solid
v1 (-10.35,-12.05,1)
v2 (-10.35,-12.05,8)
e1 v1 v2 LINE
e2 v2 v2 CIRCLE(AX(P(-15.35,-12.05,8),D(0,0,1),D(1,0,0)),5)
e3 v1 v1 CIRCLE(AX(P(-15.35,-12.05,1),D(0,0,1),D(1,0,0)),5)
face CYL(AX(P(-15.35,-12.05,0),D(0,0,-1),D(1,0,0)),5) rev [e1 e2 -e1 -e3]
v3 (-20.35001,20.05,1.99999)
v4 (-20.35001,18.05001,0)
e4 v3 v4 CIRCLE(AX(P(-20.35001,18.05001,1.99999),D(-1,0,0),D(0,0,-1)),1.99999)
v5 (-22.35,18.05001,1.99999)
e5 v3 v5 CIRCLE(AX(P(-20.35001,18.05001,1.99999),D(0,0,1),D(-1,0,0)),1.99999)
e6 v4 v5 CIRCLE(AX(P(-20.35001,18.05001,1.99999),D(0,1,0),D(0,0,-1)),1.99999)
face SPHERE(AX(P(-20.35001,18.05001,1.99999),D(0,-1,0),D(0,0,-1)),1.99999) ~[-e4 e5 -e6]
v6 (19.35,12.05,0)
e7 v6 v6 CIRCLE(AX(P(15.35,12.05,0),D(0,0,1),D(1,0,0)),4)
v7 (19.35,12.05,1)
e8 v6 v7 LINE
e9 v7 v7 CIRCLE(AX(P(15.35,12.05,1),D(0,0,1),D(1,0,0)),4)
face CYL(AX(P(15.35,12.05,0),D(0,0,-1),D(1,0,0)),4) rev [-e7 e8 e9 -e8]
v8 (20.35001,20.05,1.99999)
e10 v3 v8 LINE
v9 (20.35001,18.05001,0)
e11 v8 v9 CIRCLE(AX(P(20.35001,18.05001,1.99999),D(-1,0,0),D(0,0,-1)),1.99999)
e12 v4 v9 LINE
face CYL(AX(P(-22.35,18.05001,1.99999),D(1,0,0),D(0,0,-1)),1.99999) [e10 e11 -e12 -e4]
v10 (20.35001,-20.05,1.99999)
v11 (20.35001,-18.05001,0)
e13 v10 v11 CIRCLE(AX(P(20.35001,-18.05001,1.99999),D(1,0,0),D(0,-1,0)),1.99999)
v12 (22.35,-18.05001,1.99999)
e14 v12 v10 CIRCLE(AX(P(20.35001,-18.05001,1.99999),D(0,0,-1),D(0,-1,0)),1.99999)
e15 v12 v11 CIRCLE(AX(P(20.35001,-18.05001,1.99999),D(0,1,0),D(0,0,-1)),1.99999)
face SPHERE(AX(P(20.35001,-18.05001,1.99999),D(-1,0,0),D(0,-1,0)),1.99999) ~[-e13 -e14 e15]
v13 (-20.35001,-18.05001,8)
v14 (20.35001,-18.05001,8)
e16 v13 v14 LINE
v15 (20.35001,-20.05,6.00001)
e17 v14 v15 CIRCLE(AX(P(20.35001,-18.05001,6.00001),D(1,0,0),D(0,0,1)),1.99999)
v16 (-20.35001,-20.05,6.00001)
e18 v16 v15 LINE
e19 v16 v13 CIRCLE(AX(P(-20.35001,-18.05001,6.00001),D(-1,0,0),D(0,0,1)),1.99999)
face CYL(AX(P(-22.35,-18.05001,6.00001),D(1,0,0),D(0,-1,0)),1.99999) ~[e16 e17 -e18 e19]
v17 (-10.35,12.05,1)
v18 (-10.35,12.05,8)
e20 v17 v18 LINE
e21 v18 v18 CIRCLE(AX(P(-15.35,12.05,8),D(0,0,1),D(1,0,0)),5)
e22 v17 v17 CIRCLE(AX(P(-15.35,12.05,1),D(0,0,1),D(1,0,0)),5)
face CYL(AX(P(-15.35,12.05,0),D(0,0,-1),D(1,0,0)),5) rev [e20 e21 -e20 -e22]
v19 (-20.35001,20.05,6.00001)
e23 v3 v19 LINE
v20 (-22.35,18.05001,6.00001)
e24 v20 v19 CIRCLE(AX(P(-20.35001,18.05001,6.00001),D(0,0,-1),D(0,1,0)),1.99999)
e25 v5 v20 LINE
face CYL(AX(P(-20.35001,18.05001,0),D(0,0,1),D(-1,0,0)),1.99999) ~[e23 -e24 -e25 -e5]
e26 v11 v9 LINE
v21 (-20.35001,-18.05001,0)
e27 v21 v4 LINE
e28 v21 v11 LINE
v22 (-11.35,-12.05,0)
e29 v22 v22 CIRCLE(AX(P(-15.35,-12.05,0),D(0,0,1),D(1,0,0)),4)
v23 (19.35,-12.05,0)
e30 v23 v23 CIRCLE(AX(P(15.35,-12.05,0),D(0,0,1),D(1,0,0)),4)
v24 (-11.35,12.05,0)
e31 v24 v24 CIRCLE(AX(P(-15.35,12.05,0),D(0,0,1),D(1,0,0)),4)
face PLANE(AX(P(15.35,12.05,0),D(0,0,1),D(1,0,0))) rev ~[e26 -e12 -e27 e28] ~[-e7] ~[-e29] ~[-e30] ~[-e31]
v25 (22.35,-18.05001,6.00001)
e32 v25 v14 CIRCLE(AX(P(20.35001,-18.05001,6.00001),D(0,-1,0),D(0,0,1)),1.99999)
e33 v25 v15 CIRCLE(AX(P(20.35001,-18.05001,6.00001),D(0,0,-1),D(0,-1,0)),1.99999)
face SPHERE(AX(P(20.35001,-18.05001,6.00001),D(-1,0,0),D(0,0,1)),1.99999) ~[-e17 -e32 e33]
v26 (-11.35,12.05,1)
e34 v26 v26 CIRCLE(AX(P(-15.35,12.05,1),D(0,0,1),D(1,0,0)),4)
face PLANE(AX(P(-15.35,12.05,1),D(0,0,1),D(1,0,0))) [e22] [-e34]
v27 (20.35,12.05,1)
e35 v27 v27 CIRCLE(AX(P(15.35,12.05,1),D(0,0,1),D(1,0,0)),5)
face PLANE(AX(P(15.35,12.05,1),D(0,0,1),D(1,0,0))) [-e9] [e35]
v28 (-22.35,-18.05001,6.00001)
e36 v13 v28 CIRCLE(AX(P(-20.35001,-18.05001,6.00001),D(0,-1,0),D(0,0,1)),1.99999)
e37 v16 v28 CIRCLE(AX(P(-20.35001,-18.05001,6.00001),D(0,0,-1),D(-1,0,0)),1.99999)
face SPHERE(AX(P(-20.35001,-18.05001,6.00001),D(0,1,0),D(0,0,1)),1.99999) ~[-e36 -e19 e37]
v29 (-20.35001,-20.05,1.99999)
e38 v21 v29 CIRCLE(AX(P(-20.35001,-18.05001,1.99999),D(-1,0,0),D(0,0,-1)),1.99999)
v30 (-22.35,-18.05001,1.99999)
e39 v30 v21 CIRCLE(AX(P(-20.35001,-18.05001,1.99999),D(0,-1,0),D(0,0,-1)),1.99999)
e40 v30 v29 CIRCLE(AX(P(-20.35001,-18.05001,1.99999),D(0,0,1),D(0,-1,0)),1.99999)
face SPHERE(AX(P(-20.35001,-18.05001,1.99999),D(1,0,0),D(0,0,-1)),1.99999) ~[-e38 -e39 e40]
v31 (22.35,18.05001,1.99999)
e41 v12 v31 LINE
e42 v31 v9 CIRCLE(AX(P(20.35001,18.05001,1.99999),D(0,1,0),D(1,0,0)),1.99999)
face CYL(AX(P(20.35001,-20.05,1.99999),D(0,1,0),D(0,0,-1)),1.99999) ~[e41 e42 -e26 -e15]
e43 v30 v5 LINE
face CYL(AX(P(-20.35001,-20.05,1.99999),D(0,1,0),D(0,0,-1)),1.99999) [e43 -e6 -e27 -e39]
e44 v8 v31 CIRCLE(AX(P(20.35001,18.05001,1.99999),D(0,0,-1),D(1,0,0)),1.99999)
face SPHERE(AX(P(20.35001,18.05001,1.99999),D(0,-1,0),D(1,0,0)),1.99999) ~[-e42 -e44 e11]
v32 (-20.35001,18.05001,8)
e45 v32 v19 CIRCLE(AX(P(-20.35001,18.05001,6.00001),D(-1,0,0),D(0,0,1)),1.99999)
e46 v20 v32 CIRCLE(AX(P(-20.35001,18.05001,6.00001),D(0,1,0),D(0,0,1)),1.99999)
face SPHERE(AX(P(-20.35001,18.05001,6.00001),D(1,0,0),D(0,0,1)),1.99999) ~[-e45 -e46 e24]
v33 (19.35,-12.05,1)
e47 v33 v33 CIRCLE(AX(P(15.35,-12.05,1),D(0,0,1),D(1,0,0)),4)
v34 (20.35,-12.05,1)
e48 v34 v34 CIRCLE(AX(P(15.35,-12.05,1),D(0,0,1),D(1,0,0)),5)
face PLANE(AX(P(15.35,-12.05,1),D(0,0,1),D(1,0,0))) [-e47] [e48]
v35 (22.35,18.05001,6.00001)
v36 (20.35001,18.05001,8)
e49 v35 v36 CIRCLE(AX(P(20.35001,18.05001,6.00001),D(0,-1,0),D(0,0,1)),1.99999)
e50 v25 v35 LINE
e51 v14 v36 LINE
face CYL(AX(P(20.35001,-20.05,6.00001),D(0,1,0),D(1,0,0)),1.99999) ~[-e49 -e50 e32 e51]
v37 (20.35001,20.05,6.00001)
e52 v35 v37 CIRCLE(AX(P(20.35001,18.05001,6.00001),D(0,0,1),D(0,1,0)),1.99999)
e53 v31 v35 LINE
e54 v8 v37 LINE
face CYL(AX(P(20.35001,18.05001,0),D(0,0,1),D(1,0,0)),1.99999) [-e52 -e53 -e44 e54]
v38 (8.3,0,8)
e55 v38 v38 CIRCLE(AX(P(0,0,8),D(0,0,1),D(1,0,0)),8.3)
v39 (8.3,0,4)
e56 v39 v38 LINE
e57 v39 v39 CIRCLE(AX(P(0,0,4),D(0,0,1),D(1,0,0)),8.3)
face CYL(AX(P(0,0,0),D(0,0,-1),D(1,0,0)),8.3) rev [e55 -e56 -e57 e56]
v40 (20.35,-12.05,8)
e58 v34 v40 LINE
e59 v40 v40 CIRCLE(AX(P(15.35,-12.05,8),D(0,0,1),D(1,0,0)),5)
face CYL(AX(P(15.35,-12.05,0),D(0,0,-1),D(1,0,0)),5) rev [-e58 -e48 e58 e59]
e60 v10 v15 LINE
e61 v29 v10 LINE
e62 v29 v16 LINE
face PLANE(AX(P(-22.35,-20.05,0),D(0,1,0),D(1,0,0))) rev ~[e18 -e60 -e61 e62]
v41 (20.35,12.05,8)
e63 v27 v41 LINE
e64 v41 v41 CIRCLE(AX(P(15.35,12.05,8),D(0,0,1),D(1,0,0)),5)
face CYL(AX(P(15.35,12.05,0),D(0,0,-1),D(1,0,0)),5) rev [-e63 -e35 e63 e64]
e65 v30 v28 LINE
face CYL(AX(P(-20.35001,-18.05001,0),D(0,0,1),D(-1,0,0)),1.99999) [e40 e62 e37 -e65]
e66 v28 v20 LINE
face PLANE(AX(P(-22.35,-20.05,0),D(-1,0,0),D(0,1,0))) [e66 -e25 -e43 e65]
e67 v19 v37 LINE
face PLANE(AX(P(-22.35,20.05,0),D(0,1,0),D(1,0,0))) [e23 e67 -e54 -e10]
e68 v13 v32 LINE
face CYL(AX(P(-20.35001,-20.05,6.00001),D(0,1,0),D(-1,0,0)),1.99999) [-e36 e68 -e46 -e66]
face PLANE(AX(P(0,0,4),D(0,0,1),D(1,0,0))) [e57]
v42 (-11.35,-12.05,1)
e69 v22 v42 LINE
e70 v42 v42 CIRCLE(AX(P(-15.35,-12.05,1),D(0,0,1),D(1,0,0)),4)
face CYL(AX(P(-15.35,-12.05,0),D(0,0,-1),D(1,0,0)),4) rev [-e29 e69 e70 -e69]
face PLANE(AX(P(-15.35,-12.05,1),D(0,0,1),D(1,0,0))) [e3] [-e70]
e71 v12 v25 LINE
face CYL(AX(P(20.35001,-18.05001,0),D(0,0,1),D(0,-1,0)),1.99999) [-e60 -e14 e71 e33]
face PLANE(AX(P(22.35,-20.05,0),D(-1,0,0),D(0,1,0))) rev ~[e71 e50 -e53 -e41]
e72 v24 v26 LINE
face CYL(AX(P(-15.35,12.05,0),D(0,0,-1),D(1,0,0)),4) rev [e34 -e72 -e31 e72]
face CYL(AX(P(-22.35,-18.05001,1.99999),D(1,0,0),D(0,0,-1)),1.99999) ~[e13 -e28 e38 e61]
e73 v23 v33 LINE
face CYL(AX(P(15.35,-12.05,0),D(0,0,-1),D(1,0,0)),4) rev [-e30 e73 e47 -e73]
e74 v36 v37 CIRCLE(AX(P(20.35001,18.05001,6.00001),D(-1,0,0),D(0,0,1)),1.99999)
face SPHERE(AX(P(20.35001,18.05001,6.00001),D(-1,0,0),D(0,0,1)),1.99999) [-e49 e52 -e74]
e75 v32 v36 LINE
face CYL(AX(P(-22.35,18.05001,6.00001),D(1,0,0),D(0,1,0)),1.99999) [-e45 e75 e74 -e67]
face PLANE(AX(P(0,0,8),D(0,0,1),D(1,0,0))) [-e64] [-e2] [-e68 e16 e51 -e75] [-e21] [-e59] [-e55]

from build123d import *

# Parameters (mm, degrees)
F0_W     = 44.7
F0_H     = 40.1
F0_R     = 5
F0_R_2   = 8.3
F1_DEPTH = 8
F2_DEPTH = 4
F0_R_3   = 4
F3_DEPTH = 1
F4_R     = 1.99999


# Not quite as in the source:
# - a fillet or chamfer is up to 0.001 mm smaller than in the source, because OpenCascade refuses the exact size


with BuildPart() as f1:
    # F0 (on Top) → F1 (new body)
    with BuildSketch(Plane.XY):
        Rectangle(F0_W, F0_H)
        with Locations((-15.35, -12.05)):
            Circle(F0_R, mode=Mode.SUBTRACT)
        with Locations((15.35, -12.05)):
            Circle(F0_R, mode=Mode.SUBTRACT)
        Circle(F0_R_2, mode=Mode.SUBTRACT)
        with Locations((-15.35, 12.05)):
            Circle(F0_R, mode=Mode.SUBTRACT)
        with Locations((15.35, 12.05)):
            Circle(F0_R, mode=Mode.SUBTRACT)
    extrude(amount=F1_DEPTH)

    # F0 (on Top) → F2 (join)
    with BuildSketch(Plane.XY):
        Circle(F0_R_2)
    extrude(amount=F2_DEPTH)

    # F0 (on Top) → F3 (join)
    with BuildSketch(Plane.XY):
        with Locations((15.35, 12.05)):
            Circle(F0_R)
        with Locations((15.35, 12.05)):
            Circle(F0_R_3, mode=Mode.SUBTRACT)
        with Locations((15.35, -12.05)):
            Circle(F0_R)
        with Locations((15.35, -12.05)):
            Circle(F0_R_3, mode=Mode.SUBTRACT)
        with Locations((-15.35, -12.05)):
            Circle(F0_R)
        with Locations((-15.35, -12.05)):
            Circle(F0_R_3, mode=Mode.SUBTRACT)
        with Locations((-15.35, 12.05)):
            Circle(F0_R)
        with Locations((-15.35, 12.05)):
            Circle(F0_R_3, mode=Mode.SUBTRACT)
    extrude(amount=F3_DEPTH)

    # F4 (radius 2 in the source; OpenCascade refuses exactly that, so slightly less here)
    f4_edges = [f1.edges().sort_by_distance(p)[0] for p in [
        (0, 20.05, 8),
        (-22.35, 0, 8),
        (0, -20.05, 8),
        (22.35, 0, 8),
        (0, -20.05, 0),
        (-22.35, 0, 0),
        (-22.35, -20.05, 4),
        (22.35, -20.05, 4),
        (22.35, 0, 0),
        (22.35, 20.05, 4),
        (0, 20.05, 0),
        (-22.35, 20.05, 4),
    ]]
    fillet(f4_edges, radius=F4_R)


solid = f1.part
